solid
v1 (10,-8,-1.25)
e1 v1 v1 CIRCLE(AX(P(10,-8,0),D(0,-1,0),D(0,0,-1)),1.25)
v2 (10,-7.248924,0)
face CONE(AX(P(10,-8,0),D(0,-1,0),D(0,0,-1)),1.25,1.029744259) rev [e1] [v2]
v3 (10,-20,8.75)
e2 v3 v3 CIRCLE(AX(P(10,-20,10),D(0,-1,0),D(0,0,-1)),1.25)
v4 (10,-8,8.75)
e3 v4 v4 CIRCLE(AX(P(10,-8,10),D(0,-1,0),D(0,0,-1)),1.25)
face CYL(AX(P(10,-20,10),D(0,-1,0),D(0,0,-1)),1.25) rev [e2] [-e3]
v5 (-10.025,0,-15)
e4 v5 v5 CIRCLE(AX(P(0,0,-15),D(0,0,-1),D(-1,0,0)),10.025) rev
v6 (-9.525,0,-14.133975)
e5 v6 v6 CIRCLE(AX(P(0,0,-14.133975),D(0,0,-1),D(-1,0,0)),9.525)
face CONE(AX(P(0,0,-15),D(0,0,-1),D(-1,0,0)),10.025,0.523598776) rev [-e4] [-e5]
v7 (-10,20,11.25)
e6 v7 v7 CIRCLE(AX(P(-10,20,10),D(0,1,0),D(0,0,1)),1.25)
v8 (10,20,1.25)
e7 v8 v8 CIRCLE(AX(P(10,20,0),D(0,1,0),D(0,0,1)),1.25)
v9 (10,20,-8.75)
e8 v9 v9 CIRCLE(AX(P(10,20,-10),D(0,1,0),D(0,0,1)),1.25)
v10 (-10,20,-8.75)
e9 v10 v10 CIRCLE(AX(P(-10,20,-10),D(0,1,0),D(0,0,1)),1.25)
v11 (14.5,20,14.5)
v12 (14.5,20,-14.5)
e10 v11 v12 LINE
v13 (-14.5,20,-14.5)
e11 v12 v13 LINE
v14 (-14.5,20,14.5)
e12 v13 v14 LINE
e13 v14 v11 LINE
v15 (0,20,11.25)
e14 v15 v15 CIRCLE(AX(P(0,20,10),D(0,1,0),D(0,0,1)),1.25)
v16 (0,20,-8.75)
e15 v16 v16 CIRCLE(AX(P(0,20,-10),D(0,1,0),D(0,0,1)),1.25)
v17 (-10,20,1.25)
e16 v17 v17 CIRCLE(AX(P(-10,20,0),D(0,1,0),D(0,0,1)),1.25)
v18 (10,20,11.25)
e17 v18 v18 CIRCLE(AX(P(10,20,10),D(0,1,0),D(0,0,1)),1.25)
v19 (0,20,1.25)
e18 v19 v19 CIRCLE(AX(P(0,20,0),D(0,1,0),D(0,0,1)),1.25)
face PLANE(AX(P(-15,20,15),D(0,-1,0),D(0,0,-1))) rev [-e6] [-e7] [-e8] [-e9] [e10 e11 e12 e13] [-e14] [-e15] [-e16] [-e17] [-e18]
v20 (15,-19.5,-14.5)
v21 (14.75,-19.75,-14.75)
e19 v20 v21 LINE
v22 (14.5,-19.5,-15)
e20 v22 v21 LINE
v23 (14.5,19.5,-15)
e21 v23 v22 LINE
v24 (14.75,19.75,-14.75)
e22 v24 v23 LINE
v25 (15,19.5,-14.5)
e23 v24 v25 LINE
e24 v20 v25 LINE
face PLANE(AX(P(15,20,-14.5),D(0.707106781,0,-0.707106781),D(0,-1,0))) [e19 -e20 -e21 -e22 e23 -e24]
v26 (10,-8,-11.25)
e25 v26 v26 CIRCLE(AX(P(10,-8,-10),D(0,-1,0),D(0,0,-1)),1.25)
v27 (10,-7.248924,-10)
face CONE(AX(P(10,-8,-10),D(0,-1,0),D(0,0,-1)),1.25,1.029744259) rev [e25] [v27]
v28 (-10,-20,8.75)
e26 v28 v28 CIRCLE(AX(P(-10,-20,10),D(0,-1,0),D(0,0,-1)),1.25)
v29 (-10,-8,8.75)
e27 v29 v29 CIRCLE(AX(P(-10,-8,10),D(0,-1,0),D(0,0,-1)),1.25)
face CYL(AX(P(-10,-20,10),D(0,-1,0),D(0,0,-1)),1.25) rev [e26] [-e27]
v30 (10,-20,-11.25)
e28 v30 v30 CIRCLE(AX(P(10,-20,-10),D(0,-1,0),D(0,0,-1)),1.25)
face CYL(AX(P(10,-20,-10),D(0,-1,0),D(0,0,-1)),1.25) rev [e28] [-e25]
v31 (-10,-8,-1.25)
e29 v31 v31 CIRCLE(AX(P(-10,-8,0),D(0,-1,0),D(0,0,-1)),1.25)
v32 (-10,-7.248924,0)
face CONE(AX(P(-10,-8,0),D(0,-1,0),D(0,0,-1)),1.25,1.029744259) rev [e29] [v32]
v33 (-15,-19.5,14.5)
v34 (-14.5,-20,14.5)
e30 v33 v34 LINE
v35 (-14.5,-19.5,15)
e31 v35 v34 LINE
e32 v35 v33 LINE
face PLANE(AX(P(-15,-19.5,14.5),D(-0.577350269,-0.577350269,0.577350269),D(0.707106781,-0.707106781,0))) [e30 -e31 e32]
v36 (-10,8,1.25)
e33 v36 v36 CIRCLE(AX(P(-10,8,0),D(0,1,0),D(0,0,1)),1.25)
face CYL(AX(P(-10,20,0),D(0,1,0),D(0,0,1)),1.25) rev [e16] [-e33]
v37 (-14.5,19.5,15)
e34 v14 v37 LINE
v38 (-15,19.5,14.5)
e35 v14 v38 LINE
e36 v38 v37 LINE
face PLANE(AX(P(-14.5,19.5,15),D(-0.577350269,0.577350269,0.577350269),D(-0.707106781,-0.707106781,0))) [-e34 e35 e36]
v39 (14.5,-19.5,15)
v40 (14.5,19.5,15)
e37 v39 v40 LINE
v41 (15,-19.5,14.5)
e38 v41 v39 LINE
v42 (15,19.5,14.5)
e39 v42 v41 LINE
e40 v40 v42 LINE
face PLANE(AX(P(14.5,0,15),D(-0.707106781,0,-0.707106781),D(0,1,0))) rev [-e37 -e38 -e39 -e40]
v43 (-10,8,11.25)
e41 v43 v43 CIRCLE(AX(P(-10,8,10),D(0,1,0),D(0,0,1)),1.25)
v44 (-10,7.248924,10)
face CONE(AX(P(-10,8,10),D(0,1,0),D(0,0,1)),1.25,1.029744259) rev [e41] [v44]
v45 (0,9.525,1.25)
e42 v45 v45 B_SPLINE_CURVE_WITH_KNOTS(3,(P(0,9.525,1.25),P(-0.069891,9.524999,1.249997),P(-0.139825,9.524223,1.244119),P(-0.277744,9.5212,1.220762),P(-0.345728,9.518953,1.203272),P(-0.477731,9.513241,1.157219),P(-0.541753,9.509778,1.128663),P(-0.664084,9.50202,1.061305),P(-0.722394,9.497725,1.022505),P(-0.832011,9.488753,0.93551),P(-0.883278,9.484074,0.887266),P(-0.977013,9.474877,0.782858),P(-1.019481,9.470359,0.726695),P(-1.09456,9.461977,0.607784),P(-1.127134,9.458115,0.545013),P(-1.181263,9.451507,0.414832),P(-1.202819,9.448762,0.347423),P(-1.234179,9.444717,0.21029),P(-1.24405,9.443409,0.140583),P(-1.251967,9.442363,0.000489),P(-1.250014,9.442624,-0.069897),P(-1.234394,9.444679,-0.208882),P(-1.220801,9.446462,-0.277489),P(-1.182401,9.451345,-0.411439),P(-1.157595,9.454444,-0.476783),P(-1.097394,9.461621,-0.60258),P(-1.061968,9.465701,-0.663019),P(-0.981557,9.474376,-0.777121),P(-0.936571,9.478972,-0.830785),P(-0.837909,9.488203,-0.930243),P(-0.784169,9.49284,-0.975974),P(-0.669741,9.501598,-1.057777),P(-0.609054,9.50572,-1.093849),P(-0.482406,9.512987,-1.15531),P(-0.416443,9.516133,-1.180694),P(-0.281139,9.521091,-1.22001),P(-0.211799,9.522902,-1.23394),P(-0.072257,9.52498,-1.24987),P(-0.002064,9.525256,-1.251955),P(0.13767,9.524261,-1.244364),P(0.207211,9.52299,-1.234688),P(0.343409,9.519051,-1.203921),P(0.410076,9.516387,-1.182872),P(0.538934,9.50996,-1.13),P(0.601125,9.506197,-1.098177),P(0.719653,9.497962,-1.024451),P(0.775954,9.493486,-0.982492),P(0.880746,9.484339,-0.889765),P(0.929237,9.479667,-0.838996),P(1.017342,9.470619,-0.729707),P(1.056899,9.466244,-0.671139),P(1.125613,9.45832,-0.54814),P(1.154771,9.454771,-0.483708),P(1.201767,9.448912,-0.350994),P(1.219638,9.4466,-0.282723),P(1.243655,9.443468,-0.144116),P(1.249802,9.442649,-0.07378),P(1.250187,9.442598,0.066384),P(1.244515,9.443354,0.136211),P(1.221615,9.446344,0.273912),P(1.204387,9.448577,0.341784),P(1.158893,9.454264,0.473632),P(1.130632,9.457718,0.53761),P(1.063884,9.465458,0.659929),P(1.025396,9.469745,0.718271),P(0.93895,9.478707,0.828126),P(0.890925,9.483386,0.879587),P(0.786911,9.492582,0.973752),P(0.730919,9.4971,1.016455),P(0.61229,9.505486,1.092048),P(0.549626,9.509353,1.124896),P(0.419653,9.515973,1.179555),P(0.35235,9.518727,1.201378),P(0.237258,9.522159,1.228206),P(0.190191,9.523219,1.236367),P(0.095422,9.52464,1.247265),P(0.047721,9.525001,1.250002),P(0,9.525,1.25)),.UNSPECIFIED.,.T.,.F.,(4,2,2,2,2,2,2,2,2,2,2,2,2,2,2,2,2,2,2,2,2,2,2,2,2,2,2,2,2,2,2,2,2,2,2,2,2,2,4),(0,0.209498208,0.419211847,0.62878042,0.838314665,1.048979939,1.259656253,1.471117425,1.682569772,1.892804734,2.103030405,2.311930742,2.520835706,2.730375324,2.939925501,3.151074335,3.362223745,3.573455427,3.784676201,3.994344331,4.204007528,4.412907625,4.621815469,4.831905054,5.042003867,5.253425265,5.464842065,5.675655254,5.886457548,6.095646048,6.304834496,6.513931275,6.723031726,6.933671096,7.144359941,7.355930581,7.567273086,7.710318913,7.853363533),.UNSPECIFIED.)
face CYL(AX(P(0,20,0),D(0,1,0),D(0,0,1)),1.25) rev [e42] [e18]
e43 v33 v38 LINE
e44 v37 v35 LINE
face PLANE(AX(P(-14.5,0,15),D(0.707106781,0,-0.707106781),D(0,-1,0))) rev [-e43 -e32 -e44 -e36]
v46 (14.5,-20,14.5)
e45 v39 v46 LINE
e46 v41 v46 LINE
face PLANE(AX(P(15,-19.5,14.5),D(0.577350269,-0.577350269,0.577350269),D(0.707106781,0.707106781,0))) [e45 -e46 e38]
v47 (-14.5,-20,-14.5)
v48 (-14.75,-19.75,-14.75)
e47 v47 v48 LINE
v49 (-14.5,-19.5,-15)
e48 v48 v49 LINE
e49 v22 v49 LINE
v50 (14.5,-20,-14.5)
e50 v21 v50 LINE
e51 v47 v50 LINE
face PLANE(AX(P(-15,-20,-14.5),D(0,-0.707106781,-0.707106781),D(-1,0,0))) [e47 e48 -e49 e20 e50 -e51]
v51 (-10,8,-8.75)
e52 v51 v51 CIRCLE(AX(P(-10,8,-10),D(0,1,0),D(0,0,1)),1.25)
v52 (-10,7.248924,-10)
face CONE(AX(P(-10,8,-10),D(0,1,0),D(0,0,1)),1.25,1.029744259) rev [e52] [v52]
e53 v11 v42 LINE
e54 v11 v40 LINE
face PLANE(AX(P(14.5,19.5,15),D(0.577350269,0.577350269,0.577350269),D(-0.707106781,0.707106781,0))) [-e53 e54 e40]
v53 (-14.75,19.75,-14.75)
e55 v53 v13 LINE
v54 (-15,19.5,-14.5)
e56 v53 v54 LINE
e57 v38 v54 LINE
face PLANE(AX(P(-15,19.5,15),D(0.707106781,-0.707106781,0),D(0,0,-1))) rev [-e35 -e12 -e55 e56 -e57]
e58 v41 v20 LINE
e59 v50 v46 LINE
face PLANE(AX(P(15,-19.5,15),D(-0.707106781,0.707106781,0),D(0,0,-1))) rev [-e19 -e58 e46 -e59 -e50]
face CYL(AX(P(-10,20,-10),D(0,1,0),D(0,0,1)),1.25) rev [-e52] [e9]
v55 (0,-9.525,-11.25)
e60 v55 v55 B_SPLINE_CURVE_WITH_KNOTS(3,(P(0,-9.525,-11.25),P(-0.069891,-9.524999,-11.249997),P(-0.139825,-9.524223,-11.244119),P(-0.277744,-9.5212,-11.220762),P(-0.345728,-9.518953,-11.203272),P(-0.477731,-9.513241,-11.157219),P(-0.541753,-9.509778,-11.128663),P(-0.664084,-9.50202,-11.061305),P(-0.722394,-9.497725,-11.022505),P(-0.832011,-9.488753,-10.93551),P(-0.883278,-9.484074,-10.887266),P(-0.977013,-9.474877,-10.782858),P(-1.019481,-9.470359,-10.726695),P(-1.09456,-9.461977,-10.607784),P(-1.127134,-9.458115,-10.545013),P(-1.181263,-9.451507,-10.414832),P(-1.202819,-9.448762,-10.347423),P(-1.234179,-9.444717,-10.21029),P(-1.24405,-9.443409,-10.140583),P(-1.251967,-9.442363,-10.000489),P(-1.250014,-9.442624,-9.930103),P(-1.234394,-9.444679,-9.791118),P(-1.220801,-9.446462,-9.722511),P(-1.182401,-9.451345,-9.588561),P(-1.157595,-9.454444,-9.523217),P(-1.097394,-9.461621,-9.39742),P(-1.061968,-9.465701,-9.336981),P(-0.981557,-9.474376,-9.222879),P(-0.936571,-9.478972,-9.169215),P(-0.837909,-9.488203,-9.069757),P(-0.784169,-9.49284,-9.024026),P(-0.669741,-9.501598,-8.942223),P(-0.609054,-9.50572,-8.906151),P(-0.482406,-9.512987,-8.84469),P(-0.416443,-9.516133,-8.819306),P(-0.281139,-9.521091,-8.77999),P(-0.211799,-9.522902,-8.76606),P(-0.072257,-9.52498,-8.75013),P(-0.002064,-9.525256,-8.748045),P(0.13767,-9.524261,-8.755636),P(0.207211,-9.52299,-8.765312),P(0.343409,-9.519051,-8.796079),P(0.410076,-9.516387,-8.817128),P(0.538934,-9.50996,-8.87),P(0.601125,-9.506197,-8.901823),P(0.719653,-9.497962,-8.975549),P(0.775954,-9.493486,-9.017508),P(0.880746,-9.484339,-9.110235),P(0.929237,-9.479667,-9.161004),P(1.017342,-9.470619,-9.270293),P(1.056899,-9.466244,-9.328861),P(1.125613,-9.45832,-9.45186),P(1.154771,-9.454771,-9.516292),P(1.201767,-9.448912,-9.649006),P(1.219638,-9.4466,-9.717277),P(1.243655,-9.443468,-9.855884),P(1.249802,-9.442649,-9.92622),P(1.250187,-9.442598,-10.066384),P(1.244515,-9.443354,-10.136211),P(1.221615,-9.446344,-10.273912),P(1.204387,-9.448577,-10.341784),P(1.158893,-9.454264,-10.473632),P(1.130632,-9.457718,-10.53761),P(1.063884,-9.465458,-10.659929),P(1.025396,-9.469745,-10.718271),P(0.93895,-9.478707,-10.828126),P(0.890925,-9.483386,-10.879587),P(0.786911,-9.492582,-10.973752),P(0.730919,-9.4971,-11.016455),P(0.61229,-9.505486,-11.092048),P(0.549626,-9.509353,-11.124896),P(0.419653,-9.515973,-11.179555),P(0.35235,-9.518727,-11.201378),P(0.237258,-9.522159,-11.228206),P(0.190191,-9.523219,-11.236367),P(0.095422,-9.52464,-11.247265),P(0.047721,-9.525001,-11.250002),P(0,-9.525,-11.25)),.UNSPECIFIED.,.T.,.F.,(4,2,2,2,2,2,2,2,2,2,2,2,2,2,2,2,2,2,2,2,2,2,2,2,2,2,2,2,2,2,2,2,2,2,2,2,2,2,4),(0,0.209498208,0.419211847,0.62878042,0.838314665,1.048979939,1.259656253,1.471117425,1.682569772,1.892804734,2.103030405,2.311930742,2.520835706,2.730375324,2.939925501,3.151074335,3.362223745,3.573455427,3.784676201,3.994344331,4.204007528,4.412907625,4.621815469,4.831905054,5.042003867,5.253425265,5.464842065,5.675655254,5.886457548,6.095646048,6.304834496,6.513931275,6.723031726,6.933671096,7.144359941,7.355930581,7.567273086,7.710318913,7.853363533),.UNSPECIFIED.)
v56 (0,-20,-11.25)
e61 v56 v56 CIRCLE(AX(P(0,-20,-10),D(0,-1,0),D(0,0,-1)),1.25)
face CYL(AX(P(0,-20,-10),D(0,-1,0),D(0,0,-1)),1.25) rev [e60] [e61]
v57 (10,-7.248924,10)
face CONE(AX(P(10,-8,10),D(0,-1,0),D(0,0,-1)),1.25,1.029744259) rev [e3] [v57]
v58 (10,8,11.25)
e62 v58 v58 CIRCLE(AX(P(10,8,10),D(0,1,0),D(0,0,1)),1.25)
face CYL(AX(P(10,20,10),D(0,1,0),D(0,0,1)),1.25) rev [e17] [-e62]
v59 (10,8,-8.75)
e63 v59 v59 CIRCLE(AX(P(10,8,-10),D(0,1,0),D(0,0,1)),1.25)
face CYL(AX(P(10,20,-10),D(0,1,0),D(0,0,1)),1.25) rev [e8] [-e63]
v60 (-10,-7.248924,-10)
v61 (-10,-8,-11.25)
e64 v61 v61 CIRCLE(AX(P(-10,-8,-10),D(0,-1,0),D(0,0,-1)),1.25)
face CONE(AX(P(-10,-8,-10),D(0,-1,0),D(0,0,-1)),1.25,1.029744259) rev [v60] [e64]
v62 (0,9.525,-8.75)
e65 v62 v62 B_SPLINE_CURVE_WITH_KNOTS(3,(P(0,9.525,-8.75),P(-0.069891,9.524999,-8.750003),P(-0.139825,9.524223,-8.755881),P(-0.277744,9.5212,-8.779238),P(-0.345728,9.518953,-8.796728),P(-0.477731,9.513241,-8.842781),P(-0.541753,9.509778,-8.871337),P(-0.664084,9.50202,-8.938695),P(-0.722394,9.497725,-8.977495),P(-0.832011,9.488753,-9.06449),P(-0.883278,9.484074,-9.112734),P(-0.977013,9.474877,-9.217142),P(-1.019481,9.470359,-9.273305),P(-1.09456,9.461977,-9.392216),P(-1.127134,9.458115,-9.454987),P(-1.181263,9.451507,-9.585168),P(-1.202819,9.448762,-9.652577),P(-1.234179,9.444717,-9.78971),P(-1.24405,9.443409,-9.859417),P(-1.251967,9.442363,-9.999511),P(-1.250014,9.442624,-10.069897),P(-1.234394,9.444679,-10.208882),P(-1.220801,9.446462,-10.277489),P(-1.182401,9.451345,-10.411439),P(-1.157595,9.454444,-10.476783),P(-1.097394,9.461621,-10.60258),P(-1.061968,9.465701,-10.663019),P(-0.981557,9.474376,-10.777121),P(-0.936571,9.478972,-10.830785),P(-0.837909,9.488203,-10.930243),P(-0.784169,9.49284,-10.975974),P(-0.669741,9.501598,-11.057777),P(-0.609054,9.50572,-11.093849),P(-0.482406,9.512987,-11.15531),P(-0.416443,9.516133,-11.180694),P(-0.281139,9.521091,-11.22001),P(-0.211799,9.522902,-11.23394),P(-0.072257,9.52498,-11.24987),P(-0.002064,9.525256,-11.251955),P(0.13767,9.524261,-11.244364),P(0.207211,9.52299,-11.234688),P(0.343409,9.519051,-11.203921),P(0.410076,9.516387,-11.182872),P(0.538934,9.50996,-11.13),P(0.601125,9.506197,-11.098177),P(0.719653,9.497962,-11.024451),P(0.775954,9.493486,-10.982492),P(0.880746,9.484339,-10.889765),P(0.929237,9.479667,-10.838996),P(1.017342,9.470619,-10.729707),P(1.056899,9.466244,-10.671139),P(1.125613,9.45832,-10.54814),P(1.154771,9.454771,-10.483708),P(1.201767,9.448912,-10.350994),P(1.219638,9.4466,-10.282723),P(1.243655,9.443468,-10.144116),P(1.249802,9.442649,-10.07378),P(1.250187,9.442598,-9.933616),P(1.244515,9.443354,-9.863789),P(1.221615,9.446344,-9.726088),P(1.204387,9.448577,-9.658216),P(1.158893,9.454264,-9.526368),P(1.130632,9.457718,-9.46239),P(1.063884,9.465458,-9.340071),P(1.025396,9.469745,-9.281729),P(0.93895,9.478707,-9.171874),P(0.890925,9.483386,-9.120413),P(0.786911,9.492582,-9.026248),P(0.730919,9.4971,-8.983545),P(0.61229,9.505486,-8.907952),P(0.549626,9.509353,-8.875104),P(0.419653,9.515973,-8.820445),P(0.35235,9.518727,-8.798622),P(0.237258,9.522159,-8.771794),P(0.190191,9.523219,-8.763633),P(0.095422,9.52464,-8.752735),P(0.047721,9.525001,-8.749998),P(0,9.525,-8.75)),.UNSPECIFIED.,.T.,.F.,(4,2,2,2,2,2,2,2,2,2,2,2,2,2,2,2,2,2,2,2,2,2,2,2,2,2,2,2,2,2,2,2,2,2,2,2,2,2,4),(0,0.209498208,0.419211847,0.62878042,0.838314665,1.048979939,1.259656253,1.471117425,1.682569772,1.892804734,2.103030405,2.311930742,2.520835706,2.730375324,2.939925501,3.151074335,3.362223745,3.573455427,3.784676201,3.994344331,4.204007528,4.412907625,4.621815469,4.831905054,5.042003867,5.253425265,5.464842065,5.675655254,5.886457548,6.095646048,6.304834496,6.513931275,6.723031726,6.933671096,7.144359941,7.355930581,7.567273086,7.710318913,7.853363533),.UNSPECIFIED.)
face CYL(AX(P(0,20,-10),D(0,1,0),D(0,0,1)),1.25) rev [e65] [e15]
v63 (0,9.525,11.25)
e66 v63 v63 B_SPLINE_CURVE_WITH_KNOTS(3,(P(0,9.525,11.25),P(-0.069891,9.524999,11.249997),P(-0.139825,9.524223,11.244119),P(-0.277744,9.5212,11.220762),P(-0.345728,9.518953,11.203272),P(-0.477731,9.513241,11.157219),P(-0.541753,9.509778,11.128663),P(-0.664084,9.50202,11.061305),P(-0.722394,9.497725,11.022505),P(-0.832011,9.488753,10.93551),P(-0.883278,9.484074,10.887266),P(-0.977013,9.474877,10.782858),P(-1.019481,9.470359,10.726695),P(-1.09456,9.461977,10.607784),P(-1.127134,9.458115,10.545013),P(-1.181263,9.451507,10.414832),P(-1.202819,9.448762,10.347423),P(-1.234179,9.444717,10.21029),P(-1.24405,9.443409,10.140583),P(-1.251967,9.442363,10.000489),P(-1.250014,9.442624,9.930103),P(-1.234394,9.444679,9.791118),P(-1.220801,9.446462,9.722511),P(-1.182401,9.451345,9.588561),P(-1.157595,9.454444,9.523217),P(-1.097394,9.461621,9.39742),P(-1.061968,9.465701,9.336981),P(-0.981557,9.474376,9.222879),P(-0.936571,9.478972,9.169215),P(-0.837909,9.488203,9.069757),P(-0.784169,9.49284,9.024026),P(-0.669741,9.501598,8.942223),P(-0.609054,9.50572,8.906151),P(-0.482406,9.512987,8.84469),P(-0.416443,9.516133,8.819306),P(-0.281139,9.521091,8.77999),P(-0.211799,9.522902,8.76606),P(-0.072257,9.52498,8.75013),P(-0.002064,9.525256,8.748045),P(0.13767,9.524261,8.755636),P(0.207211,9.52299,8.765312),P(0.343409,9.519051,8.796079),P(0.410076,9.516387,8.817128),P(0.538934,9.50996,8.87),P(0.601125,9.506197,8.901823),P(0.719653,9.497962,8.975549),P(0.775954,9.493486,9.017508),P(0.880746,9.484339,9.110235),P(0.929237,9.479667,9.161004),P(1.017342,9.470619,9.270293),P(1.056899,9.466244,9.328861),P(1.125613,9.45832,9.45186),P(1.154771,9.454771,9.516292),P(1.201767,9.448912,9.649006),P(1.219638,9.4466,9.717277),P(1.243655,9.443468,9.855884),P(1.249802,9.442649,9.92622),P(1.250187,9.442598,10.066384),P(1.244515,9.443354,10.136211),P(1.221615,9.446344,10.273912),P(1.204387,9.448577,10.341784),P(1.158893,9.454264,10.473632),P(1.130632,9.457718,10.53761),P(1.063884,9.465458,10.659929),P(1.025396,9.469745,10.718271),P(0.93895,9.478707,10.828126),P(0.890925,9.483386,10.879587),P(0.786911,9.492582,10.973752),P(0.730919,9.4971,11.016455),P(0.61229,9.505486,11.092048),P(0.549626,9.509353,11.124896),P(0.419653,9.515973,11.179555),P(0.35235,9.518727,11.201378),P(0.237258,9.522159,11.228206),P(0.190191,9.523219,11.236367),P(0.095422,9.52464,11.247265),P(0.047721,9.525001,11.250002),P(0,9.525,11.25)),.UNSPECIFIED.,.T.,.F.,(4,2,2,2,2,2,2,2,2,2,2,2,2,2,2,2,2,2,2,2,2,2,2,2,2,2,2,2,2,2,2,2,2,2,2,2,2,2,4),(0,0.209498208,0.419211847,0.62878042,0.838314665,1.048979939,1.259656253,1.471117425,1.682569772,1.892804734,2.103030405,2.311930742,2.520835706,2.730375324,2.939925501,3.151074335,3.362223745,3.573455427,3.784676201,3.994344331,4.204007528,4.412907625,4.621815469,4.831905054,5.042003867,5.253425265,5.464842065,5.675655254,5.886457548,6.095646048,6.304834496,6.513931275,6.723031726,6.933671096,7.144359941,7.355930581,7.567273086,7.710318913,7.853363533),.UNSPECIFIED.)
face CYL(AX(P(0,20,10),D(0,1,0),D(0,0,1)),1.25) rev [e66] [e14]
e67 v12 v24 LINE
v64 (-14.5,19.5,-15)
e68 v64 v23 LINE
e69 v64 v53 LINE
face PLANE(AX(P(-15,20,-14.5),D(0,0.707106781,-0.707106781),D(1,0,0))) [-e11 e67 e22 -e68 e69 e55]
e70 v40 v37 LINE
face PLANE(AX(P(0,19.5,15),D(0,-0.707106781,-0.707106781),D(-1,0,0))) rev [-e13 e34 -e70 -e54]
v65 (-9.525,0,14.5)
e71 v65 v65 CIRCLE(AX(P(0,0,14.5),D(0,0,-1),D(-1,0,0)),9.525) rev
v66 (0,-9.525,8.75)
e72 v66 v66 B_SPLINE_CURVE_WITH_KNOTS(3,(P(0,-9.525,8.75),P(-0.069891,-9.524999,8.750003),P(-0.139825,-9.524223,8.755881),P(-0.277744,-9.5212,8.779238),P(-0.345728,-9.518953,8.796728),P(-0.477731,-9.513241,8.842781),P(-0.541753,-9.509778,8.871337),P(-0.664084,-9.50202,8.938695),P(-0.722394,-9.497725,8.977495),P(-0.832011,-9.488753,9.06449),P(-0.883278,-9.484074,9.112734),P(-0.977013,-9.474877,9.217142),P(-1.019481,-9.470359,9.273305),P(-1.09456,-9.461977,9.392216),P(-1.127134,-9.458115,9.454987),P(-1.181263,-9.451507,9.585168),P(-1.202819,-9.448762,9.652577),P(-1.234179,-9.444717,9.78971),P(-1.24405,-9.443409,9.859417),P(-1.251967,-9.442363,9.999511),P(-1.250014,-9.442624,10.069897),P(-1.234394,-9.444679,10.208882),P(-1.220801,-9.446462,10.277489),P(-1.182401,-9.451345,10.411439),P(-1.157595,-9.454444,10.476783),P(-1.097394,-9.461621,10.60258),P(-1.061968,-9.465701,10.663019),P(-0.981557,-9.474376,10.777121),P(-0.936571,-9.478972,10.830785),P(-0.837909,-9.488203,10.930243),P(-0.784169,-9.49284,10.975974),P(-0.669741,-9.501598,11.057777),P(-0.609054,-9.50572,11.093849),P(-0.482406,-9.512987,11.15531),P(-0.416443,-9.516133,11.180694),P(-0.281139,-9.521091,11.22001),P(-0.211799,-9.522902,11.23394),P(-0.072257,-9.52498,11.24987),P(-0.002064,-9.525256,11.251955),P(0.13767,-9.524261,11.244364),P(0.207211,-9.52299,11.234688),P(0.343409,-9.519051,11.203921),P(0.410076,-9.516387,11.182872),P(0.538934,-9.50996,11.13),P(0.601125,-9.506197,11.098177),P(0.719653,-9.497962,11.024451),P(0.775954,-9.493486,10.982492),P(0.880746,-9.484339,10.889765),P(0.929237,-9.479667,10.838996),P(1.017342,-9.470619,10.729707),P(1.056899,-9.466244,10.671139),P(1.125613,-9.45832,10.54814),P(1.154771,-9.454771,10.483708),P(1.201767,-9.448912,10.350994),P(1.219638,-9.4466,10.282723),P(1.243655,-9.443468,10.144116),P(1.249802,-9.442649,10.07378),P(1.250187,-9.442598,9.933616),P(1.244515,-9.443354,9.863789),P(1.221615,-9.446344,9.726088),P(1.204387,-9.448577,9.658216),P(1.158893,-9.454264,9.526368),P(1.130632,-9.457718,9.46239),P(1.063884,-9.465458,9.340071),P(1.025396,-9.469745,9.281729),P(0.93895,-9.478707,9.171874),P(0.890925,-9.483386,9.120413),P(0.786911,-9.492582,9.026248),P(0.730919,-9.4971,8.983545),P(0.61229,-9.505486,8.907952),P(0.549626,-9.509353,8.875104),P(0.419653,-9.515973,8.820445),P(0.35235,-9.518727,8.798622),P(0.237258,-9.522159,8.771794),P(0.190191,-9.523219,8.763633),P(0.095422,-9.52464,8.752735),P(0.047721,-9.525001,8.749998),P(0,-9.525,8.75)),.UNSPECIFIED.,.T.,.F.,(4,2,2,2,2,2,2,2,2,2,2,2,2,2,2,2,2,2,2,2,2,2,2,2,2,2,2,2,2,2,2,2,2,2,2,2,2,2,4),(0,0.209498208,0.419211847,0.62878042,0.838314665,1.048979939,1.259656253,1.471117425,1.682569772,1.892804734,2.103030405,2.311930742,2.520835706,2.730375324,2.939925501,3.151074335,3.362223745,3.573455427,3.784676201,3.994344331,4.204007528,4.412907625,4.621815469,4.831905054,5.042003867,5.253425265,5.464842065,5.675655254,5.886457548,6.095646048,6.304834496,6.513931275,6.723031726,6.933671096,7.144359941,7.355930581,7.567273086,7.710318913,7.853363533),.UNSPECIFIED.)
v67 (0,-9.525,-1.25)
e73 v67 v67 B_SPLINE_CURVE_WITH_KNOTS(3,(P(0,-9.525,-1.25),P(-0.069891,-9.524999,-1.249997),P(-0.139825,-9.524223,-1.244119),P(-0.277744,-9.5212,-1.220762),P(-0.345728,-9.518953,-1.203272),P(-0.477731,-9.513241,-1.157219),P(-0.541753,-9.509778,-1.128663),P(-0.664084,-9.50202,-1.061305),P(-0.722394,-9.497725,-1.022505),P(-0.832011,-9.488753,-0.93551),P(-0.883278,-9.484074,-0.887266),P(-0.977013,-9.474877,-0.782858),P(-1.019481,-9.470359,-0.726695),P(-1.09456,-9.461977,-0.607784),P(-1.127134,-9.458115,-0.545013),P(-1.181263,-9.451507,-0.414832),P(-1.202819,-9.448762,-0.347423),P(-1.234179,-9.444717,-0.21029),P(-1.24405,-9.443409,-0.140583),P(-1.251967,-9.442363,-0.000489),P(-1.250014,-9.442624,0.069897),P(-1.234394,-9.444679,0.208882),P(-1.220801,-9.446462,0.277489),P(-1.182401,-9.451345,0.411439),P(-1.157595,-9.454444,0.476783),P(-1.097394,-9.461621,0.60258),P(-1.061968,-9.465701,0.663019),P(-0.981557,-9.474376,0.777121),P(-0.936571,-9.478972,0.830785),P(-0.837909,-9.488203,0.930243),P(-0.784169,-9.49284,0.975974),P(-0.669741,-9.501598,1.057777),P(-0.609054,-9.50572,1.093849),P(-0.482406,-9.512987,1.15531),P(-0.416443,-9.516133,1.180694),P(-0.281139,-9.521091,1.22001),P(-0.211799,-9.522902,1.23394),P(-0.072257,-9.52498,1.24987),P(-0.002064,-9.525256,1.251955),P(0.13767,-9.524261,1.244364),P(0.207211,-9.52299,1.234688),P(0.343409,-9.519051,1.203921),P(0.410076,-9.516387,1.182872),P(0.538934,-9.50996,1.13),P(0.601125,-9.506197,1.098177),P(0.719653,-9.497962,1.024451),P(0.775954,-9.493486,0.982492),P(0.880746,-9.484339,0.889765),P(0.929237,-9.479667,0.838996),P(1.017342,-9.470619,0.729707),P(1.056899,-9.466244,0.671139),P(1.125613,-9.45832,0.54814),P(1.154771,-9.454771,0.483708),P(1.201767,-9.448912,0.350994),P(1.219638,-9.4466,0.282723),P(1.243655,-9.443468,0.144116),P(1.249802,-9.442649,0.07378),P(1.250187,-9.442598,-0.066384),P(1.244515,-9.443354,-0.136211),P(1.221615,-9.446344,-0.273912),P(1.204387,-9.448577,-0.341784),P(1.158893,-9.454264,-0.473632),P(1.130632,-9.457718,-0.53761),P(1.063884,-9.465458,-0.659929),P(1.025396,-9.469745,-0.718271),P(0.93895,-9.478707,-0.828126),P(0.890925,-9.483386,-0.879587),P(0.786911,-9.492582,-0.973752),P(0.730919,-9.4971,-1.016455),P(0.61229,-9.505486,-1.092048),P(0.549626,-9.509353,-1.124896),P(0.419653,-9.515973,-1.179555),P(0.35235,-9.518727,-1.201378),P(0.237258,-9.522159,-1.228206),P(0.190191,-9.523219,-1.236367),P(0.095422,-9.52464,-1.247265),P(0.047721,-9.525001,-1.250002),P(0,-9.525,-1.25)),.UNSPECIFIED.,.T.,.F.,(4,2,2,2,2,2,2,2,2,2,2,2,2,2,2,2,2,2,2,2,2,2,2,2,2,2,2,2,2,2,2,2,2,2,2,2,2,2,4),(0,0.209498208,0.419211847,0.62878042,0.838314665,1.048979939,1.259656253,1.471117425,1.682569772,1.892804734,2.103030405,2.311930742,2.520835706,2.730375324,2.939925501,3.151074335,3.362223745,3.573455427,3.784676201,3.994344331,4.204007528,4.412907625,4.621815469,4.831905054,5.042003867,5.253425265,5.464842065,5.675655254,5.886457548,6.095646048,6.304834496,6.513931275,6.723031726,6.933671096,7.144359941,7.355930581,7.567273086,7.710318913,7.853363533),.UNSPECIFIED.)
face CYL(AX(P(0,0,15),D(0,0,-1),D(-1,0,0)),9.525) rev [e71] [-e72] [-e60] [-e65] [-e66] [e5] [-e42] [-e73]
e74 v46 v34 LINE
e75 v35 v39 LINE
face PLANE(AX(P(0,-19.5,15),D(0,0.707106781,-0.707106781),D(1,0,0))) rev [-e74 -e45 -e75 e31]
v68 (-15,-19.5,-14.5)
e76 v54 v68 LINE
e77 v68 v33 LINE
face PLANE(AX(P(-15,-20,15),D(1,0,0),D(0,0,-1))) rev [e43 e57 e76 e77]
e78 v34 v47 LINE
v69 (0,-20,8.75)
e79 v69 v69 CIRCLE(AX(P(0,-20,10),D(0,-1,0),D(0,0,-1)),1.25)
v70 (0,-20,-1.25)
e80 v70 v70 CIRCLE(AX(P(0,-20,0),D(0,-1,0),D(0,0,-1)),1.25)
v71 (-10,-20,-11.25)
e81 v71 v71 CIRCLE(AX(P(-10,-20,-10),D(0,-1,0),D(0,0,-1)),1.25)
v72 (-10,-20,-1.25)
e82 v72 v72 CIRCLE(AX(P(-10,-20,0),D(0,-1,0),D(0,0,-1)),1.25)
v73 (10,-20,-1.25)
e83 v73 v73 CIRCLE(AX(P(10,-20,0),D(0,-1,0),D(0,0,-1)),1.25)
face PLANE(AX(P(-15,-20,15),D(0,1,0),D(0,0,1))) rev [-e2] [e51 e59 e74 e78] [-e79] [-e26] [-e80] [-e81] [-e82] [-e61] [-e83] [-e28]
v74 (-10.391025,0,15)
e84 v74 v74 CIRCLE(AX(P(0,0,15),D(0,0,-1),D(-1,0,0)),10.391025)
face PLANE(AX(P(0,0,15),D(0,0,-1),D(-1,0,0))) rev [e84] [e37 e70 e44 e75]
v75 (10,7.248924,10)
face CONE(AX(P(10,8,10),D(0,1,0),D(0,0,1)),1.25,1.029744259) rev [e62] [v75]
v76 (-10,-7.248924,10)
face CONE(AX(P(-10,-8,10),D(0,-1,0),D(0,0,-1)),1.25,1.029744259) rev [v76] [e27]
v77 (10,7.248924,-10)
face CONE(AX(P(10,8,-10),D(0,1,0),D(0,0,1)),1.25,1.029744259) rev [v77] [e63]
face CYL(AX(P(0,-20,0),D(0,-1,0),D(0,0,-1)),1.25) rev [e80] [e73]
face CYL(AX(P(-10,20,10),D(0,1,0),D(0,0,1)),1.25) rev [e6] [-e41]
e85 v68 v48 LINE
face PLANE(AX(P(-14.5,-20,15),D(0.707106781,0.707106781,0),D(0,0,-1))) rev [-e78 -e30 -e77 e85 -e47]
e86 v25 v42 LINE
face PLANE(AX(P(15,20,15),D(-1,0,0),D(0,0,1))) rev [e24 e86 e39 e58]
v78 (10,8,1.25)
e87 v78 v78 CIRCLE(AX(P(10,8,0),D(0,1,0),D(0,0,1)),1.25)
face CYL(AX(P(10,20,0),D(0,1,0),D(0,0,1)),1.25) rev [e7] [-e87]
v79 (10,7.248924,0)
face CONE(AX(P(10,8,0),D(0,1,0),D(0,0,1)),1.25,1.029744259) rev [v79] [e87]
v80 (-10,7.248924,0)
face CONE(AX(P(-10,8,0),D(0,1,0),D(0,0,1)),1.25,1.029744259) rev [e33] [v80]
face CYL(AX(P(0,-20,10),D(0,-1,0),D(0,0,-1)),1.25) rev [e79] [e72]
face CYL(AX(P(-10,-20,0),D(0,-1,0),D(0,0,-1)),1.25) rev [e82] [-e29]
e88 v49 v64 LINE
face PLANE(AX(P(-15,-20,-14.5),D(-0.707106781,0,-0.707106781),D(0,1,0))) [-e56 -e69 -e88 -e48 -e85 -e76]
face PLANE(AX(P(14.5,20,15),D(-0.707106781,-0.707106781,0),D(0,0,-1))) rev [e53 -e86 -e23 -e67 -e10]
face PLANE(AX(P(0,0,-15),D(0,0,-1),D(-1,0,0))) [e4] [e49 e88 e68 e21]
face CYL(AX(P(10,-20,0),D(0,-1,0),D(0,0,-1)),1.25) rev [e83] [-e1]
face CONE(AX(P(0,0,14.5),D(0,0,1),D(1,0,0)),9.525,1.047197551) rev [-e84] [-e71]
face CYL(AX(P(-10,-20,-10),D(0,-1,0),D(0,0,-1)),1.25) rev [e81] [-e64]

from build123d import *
from OCP.BRepFilletAPI import BRepFilletAPI_MakeChamfer

# Parameters (mm, degrees)
SKETCH1_W                      = 30
SKETCH1_H                      = 40
SKETCH1_R                      = 9.525
BOSS_EXTRUDE1_DEPTH            = 15
CHAMFER2_SIZE                  = 0.5
CHAMFER2_SIZE2                 = 0.866025404
CHAMFER3_SIZE                  = 0.5
M3X0_5_TAPPED_HOLE1_AT_2_COUNT = 2
M3X0_5_TAPPED_HOLE1_AT_2_PITCH = 20
M3X0_5_TAPPED_HOLE1_AT_3_COUNT = 2
M3X0_5_TAPPED_HOLE1_AT_3_PITCH = 10
M3X0_5_TAPPED_HOLE1_AT_4_COUNT = 2
M3X0_5_TAPPED_HOLE1_AT_4_PITCH = 10
M3X0_5_TAPPED_HOLE1_AT_5_COUNT = 2
M3X0_5_TAPPED_HOLE1_AT_5_PITCH = 10
M3X0_5_TAPPED_HOLE1_AT_6_COUNT = 2
M3X0_5_TAPPED_HOLE1_AT_6_PITCH = 22.360679775
M3X0_5_TAPPED_HOLE1_AT_7_COUNT = 2
M3X0_5_TAPPED_HOLE1_AT_7_PITCH = 22.360679775
M3X0_5_TAPPED_HOLE1_AT_8_COUNT = 2
M3X0_5_TAPPED_HOLE1_AT_8_PITCH = 14.142135624
M3X0_5_TAPPED_HOLE1_AT_9_COUNT = 2
M3X0_5_TAPPED_HOLE1_AT_9_PITCH = 14.142135624
CIRPATTERN1_COUNT              = 2


with BuildPart() as part:
    # Sketch1 → Boss-Extrude1 (new, symmetric)
    with BuildSketch(Plane.XY):
        Rectangle(SKETCH1_W, SKETCH1_H)
        Circle(SKETCH1_R, mode=Mode.SUBTRACT)
    extrude(amount=BOSS_EXTRUDE1_DEPTH, both=True)

    # Chamfer2: one chamfer whose edges measure the first distance from different faces: ONE call of the kernel's chamfer builder (chamfer() names one face for all edges)
    chamfer2_edges_1 = [part.edges().sort_by_distance(p)[0] for p in [
        (-9.525, 0, -15),
    ]]
    chamfer2_side_1 = [part.faces().sort_by_distance(p)[0] for p in [
        (0, -19.5, -15),
    ]]
    chamfer2_edges_2 = [part.edges().sort_by_distance(p)[0] for p in [
        (-9.525, 0, 15),
    ]]
    chamfer2_side_2 = [part.faces().sort_by_distance(p)[0] for p in [
        (-9.525, 0, 0),
    ]]
    chamfer2 = BRepFilletAPI_MakeChamfer(part.part.solid().wrapped)
    for e in chamfer2_edges_1:
        chamfer2.Add(CHAMFER2_SIZE, CHAMFER2_SIZE2, e.wrapped, chamfer2_side_1[0].wrapped)  # the first distance lies on this face
    for e in chamfer2_edges_2:
        chamfer2.Add(CHAMFER2_SIZE, CHAMFER2_SIZE2, e.wrapped, chamfer2_side_2[0].wrapped)  # the first distance lies on this face
    add(Compound.cast(chamfer2.Shape()), mode=Mode.REPLACE)

    # Chamfer3
    chamfer3_edges = [part.edges().sort_by_distance(p)[0] for p in [
        (0, 20, -15),
        (0, -20, -15),
    ]]
    chamfer(chamfer3_edges, length=CHAMFER3_SIZE)

    # Sketch8 → M3x0.5 Tapped Hole1 (revolve, cut)
    with BuildSketch(Plane(origin=(-10, 20, 0), x_dir=(0, 0, 1), z_dir=(1, 0, 0))):
        Polygon((0, 0), (0, 12.751075774), (1.25, 12), (1.25, 0), align=None)
    m3x0_5_tapped_hole1 = revolve(axis=Axis((-10, 26.35, 0), (0, -1, 0)), mode=Mode.SUBTRACT)

    # M3x0.5 Tapped Hole1 at 2: M3x0.5 Tapped Hole1 ×2
    with Locations(*[(i * M3X0_5_TAPPED_HOLE1_AT_2_PITCH, 0, 0) for i in range(1, M3X0_5_TAPPED_HOLE1_AT_2_COUNT)]):
        add(m3x0_5_tapped_hole1, mode=Mode.SUBTRACT)

    # M3x0.5 Tapped Hole1 at 3: M3x0.5 Tapped Hole1 ×2
    with Locations(*[(i * M3X0_5_TAPPED_HOLE1_AT_3_PITCH, 0, 0) for i in range(1, M3X0_5_TAPPED_HOLE1_AT_3_COUNT)]):
        add(m3x0_5_tapped_hole1, mode=Mode.SUBTRACT)

    # M3x0.5 Tapped Hole1 at 4: M3x0.5 Tapped Hole1 ×2
    with Locations(*[(0, 0, -i * M3X0_5_TAPPED_HOLE1_AT_4_PITCH) for i in range(1, M3X0_5_TAPPED_HOLE1_AT_4_COUNT)]):
        add(m3x0_5_tapped_hole1, mode=Mode.SUBTRACT)

    # M3x0.5 Tapped Hole1 at 5: M3x0.5 Tapped Hole1 ×2
    with Locations(*[(0, 0, i * M3X0_5_TAPPED_HOLE1_AT_5_PITCH) for i in range(1, M3X0_5_TAPPED_HOLE1_AT_5_COUNT)]):
        add(m3x0_5_tapped_hole1, mode=Mode.SUBTRACT)

    # M3x0.5 Tapped Hole1 at 6: M3x0.5 Tapped Hole1 ×2
    with Locations(*[Vector(0.894427190999916, 0, -0.44721359549995787) * (i * M3X0_5_TAPPED_HOLE1_AT_6_PITCH) for i in range(1, M3X0_5_TAPPED_HOLE1_AT_6_COUNT)]):
        add(m3x0_5_tapped_hole1, mode=Mode.SUBTRACT)

    # M3x0.5 Tapped Hole1 at 7: M3x0.5 Tapped Hole1 ×2
    with Locations(*[Vector(0.8944271909999159, 0, 0.447213595499958) * (i * M3X0_5_TAPPED_HOLE1_AT_7_PITCH) for i in range(1, M3X0_5_TAPPED_HOLE1_AT_7_COUNT)]):
        add(m3x0_5_tapped_hole1, mode=Mode.SUBTRACT)

    # M3x0.5 Tapped Hole1 at 8: M3x0.5 Tapped Hole1 ×2
    with Locations(*[Vector(0.7071067811865476, 0, -0.7071067811865475) * (i * M3X0_5_TAPPED_HOLE1_AT_8_PITCH) for i in range(1, M3X0_5_TAPPED_HOLE1_AT_8_COUNT)]):
        add(m3x0_5_tapped_hole1, mode=Mode.SUBTRACT)

    # M3x0.5 Tapped Hole1 at 9: M3x0.5 Tapped Hole1 ×2
    with Locations(*[Vector(0.7071067811865475, 0, 0.7071067811865476) * (i * M3X0_5_TAPPED_HOLE1_AT_9_PITCH) for i in range(1, M3X0_5_TAPPED_HOLE1_AT_9_COUNT)]):
        add(m3x0_5_tapped_hole1, mode=Mode.SUBTRACT)

    # CirPattern1: M3x0.5 Tapped Hole1 ×2 about axis
    cirpattern1_axis = Axis((0, 0, 15), (0, 0, -1))
    for i in range(1, CIRPATTERN1_COUNT):
        add(m3x0_5_tapped_hole1.rotate(cirpattern1_axis, i * 360 / CIRPATTERN1_COUNT), mode=Mode.SUBTRACT)

    # CirPattern1 copy 1 sketch → CirPattern1 copy 1 (revolve, cut)
    with BuildSketch(Plane(origin=(-10, -20, 0), x_dir=(0, 0, 1), z_dir=(-1, 0, 0))):
        Polygon((0, 0), (0, 12.751075774), (1.25, 12), (1.25, 0), align=None)
    revolve(axis=Axis((-10, -26.35, 0), (0, 1, 0)), mode=Mode.SUBTRACT)

    # CirPattern1 copy 2 sketch → CirPattern1 copy 2 (revolve, cut)
    with BuildSketch(Plane(origin=(0, -20, 0), x_dir=(0, 0, 1), z_dir=(-1, 0, 0))):
        Polygon((0, 0), (0, 12.751075774), (1.25, 12), (1.25, 0), align=None)
    revolve(axis=Axis((0, -26.35, 0), (0, 1, 0)), mode=Mode.SUBTRACT)

    # CirPattern1 copy 3 sketch → CirPattern1 copy 3 (revolve, cut)
    with BuildSketch(Plane(origin=(10, -20, -10), x_dir=(0, 0, 1), z_dir=(-1, 0, 0))):
        Polygon((0, 0), (0, 12.751075774), (1.25, 12), (1.25, 0), align=None)
    revolve(axis=Axis((10, -26.35, -10), (0, 1, 0)), mode=Mode.SUBTRACT)

    # CirPattern1 copy 4 sketch → CirPattern1 copy 4 (revolve, cut)
    with BuildSketch(Plane(origin=(10, -20, 10), x_dir=(0, 0, 1), z_dir=(-1, 0, 0))):
        Polygon((0, 0), (0, 12.751075774), (1.25, 12), (1.25, 0), align=None)
    revolve(axis=Axis((10, -26.35, 10), (0, 1, 0)), mode=Mode.SUBTRACT)

    # CirPattern1 copy 5 sketch → CirPattern1 copy 5 (revolve, cut)
    with BuildSketch(Plane(origin=(-10, -20, -10), x_dir=(0, 0, 1), z_dir=(-1, 0, 0))):
        Polygon((0, 0), (0, 12.751075774), (1.25, 12), (1.25, 0), align=None)
    revolve(axis=Axis((-10, -26.35, -10), (0, 1, 0)), mode=Mode.SUBTRACT)

    # CirPattern1 copy 6 sketch → CirPattern1 copy 6 (revolve, cut)
    with BuildSketch(Plane(origin=(-10, -20, 10), x_dir=(0, 0, 1), z_dir=(-1, 0, 0))):
        Polygon((0, 0), (0, 12.751075774), (1.25, 12), (1.25, 0), align=None)
    revolve(axis=Axis((-10, -26.35, 10), (0, 1, 0)), mode=Mode.SUBTRACT)

    # CirPattern1 copy 7 sketch → CirPattern1 copy 7 (revolve, cut)
    with BuildSketch(Plane(origin=(0, -20, -10), x_dir=(0, 0, 1), z_dir=(-1, 0, 0))):
        Polygon((0, 0), (0, 12.751075774), (1.25, 12), (1.25, 0), align=None)
    revolve(axis=Axis((0, -26.35, -10), (0, 1, 0)), mode=Mode.SUBTRACT)

    # CirPattern1 copy 8 sketch → CirPattern1 copy 8 (revolve, cut)
    with BuildSketch(Plane(origin=(0, -20, 10), x_dir=(0, 0, 1), z_dir=(-1, 0, 0))):
        Polygon((0, 0), (0, 12.751075774), (1.25, 12), (1.25, 0), align=None)
    revolve(axis=Axis((0, -26.35, 10), (0, 1, 0)), mode=Mode.SUBTRACT)

    # Chamfer6
    # the kernel refuses this chamfer: 0.5 mm, written as the material it takes off along each edge
    with BuildSketch(Plane(origin=(14.666666667, -19.666666667, 14.666666667), x_dir=(0.7071067811865475, 0.7071067811865475, 0), z_dir=(0.5773502691896258, -0.5773502691896258, 0.5773502691896258)), Plane(origin=(-14.666666667, -19.666666667, 14.666666667), x_dir=(0, 0.7071067811865475, 0.7071067811865475), z_dir=(-0.5773502691896258, -0.5773502691896258, 0.5773502691896258))) as chamfer6_piece_1:
        Polygon((-0.353553391, -0.204124145), (0.353553391, -0.204124145), (0, 0.40824829), align=None)
    extrude(amount=0.635085296, mode=Mode.SUBTRACT)
    with BuildSketch(Plane(origin=(14.666666667, 19.666666667, 14.666666667), x_dir=(-0.7071067811865475, 0, 0.7071067811865475), z_dir=(0.5773502691896258, 0.5773502691896258, 0.5773502691896258)), Plane(origin=(-14.666666667, 19.666666667, 14.666666667), x_dir=(-0.7071067811865475, 0, -0.7071067811865475), z_dir=(-0.5773502691896258, 0.5773502691896258, 0.5773502691896258))) as chamfer6_piece_2:
        Polygon((-0.353553391, 0.204124145), (0.353553391, 0.204124145), (0, -0.40824829), align=None)
    extrude(amount=0.635085296, mode=Mode.SUBTRACT)
    with BuildSketch(Plane(origin=(15, -20.785841494, -15), x_dir=(0.027495876610585647, 0, 0.9996219169112968), z_dir=(0, 1, 0)), Plane(origin=(-15, 20.785841494, -15), x_dir=(-0.027495876610585647, 0, 0.9996219169112968), z_dir=(0, -1, 0))) as chamfer6_piece_3:
        with BuildLine():
            Line((0.514336598, 0), (-0.028273577, -0.513558897))
            Line((-0.028273577, -0.513558897), (-0.038269797, -0.513283938))
            ThreePointArc((-0.038269797, -0.513283938), (-0.017064614, -0.256698915), (-0.009996219, 0.000274959))
            Line((-0.009996219, 0.000274959), (0.000274959, 0.009996219))
            ThreePointArc((0.000274959, 0.009996219), (0.257248832, 0.002927825), (0.514611556, 0.009996219))
            Line((0.514611556, 0.009996219), (0.514336598, 0))
        make_face()
    extrude(amount=41.571682988, mode=Mode.SUBTRACT)
    with BuildSketch(Plane(origin=(15, -21.285841494, 15), x_dir=(0.027495876610585647, 0, -0.9996219169112968), z_dir=(0, 1, 0))) as chamfer6_piece_4:
        with BuildLine():
            Line((0.514336598, 0), (-0.028273577, 0.513558897))
            Line((-0.028273577, 0.513558897), (-0.038269797, 0.513283938))
            ThreePointArc((-0.038269797, 0.513283938), (-0.017064614, 0.256698915), (-0.009996219, -0.000274959))
            Line((-0.009996219, -0.000274959), (0.000274959, -0.009996219))
            ThreePointArc((0.000274959, -0.009996219), (0.257248832, -0.002927825), (0.514611556, -0.009996219))
            Line((0.514611556, -0.009996219), (0.514336598, 0))
        make_face()
    extrude(amount=42.571682988, mode=Mode.SUBTRACT)
    with BuildSketch(Plane(origin=(15, 20, -15.785841494), x_dir=(0.02749587661058555, -0.9996219169112968, 0), z_dir=(0, 0, 1)), Plane(origin=(-15, 20, 16.285841494), x_dir=(-0.02749587661058555, -0.9996219169112968, 0), z_dir=(0, 0, -1)), Plane(origin=(-15, -20, 16.285841494), x_dir=(0.9996219169112968, -0.0274958766105891, 0), z_dir=(0, 0, -1)), Plane(origin=(15, -20, -15.785841494), x_dir=(-0.9996219169112968, -0.0274958766105891, 0), z_dir=(0, 0, 1))) as chamfer6_piece_5:
        with BuildLine():
            Line((0.514336598, 0), (-0.028273577, -0.513558897))
            Line((-0.028273577, -0.513558897), (-0.038269797, -0.513283938))
            ThreePointArc((-0.038269797, -0.513283938), (-0.017064614, -0.256698915), (-0.009996219, 0.000274959))
            Line((-0.009996219, 0.000274959), (0.000274959, 0.009996219))
            ThreePointArc((0.000274959, 0.009996219), (0.257248832, 0.002927825), (0.514611556, 0.009996219))
            Line((0.514611556, 0.009996219), (0.514336598, 0))
        make_face()
    extrude(amount=32.071682988, mode=Mode.SUBTRACT)
    with BuildSketch(Plane(origin=(16.285841494, 20, 15), x_dir=(0, -0.9996219169112968, 0.02749587661058555), z_dir=(-1, 0, 0))) as chamfer6_piece_6:
        with BuildLine():
            Line((0.514336598, 0), (-0.028273577, -0.513558897))
            Line((-0.028273577, -0.513558897), (-0.038269797, -0.513283938))
            ThreePointArc((-0.038269797, -0.513283938), (-0.017064614, -0.256698915), (-0.009996219, 0.000274959))
            Line((-0.009996219, 0.000274959), (0.000274959, 0.009996219))
            ThreePointArc((0.000274959, 0.009996219), (0.257248832, 0.002927825), (0.514611556, 0.009996219))
            Line((0.514611556, 0.009996219), (0.514336598, 0))
        make_face()
    extrude(amount=32.571682988, mode=Mode.SUBTRACT)
    with BuildSketch(Plane(origin=(-16.285841494, -20, 15), x_dir=(0, -0.0274958766105891, -0.9996219169112968), z_dir=(1, 0, 0))) as chamfer6_piece_7:
        with BuildLine():
            Line((0.514336598, 0), (-0.028273577, 0.513558897))
            Line((-0.028273577, 0.513558897), (-0.038269797, 0.513283938))
            ThreePointArc((-0.038269797, 0.513283938), (-0.017064614, 0.256698915), (-0.009996219, -0.000274959))
            Line((-0.009996219, -0.000274959), (0.000274959, -0.009996219))
            ThreePointArc((0.000274959, -0.009996219), (0.257248832, -0.002927825), (0.514611556, -0.009996219))
            Line((0.514611556, -0.009996219), (0.514336598, 0))
        make_face()
    extrude(amount=32.571682988, mode=Mode.SUBTRACT)
    with BuildSketch(Plane(origin=(-15, 21.285841494, 15), x_dir=(0.9996219169112968, 0, 0.027495876610585647), z_dir=(0, -1, 0))) as chamfer6_piece_8:
        with BuildLine():
            Line((0.514336598, 0), (-0.028273577, -0.513558897))
            Line((-0.028273577, -0.513558897), (-0.038269797, -0.513283938))
            ThreePointArc((-0.038269797, -0.513283938), (-0.017064614, -0.256698915), (-0.009996219, 0.000274959))
            Line((-0.009996219, 0.000274959), (0.000274959, 0.009996219))
            ThreePointArc((0.000274959, 0.009996219), (0.257248832, 0.002927825), (0.514611556, 0.009996219))
            Line((0.514611556, 0.009996219), (0.514336598, 0))
        make_face()
    extrude(amount=42.571682988, mode=Mode.SUBTRACT)


solid = part.part
